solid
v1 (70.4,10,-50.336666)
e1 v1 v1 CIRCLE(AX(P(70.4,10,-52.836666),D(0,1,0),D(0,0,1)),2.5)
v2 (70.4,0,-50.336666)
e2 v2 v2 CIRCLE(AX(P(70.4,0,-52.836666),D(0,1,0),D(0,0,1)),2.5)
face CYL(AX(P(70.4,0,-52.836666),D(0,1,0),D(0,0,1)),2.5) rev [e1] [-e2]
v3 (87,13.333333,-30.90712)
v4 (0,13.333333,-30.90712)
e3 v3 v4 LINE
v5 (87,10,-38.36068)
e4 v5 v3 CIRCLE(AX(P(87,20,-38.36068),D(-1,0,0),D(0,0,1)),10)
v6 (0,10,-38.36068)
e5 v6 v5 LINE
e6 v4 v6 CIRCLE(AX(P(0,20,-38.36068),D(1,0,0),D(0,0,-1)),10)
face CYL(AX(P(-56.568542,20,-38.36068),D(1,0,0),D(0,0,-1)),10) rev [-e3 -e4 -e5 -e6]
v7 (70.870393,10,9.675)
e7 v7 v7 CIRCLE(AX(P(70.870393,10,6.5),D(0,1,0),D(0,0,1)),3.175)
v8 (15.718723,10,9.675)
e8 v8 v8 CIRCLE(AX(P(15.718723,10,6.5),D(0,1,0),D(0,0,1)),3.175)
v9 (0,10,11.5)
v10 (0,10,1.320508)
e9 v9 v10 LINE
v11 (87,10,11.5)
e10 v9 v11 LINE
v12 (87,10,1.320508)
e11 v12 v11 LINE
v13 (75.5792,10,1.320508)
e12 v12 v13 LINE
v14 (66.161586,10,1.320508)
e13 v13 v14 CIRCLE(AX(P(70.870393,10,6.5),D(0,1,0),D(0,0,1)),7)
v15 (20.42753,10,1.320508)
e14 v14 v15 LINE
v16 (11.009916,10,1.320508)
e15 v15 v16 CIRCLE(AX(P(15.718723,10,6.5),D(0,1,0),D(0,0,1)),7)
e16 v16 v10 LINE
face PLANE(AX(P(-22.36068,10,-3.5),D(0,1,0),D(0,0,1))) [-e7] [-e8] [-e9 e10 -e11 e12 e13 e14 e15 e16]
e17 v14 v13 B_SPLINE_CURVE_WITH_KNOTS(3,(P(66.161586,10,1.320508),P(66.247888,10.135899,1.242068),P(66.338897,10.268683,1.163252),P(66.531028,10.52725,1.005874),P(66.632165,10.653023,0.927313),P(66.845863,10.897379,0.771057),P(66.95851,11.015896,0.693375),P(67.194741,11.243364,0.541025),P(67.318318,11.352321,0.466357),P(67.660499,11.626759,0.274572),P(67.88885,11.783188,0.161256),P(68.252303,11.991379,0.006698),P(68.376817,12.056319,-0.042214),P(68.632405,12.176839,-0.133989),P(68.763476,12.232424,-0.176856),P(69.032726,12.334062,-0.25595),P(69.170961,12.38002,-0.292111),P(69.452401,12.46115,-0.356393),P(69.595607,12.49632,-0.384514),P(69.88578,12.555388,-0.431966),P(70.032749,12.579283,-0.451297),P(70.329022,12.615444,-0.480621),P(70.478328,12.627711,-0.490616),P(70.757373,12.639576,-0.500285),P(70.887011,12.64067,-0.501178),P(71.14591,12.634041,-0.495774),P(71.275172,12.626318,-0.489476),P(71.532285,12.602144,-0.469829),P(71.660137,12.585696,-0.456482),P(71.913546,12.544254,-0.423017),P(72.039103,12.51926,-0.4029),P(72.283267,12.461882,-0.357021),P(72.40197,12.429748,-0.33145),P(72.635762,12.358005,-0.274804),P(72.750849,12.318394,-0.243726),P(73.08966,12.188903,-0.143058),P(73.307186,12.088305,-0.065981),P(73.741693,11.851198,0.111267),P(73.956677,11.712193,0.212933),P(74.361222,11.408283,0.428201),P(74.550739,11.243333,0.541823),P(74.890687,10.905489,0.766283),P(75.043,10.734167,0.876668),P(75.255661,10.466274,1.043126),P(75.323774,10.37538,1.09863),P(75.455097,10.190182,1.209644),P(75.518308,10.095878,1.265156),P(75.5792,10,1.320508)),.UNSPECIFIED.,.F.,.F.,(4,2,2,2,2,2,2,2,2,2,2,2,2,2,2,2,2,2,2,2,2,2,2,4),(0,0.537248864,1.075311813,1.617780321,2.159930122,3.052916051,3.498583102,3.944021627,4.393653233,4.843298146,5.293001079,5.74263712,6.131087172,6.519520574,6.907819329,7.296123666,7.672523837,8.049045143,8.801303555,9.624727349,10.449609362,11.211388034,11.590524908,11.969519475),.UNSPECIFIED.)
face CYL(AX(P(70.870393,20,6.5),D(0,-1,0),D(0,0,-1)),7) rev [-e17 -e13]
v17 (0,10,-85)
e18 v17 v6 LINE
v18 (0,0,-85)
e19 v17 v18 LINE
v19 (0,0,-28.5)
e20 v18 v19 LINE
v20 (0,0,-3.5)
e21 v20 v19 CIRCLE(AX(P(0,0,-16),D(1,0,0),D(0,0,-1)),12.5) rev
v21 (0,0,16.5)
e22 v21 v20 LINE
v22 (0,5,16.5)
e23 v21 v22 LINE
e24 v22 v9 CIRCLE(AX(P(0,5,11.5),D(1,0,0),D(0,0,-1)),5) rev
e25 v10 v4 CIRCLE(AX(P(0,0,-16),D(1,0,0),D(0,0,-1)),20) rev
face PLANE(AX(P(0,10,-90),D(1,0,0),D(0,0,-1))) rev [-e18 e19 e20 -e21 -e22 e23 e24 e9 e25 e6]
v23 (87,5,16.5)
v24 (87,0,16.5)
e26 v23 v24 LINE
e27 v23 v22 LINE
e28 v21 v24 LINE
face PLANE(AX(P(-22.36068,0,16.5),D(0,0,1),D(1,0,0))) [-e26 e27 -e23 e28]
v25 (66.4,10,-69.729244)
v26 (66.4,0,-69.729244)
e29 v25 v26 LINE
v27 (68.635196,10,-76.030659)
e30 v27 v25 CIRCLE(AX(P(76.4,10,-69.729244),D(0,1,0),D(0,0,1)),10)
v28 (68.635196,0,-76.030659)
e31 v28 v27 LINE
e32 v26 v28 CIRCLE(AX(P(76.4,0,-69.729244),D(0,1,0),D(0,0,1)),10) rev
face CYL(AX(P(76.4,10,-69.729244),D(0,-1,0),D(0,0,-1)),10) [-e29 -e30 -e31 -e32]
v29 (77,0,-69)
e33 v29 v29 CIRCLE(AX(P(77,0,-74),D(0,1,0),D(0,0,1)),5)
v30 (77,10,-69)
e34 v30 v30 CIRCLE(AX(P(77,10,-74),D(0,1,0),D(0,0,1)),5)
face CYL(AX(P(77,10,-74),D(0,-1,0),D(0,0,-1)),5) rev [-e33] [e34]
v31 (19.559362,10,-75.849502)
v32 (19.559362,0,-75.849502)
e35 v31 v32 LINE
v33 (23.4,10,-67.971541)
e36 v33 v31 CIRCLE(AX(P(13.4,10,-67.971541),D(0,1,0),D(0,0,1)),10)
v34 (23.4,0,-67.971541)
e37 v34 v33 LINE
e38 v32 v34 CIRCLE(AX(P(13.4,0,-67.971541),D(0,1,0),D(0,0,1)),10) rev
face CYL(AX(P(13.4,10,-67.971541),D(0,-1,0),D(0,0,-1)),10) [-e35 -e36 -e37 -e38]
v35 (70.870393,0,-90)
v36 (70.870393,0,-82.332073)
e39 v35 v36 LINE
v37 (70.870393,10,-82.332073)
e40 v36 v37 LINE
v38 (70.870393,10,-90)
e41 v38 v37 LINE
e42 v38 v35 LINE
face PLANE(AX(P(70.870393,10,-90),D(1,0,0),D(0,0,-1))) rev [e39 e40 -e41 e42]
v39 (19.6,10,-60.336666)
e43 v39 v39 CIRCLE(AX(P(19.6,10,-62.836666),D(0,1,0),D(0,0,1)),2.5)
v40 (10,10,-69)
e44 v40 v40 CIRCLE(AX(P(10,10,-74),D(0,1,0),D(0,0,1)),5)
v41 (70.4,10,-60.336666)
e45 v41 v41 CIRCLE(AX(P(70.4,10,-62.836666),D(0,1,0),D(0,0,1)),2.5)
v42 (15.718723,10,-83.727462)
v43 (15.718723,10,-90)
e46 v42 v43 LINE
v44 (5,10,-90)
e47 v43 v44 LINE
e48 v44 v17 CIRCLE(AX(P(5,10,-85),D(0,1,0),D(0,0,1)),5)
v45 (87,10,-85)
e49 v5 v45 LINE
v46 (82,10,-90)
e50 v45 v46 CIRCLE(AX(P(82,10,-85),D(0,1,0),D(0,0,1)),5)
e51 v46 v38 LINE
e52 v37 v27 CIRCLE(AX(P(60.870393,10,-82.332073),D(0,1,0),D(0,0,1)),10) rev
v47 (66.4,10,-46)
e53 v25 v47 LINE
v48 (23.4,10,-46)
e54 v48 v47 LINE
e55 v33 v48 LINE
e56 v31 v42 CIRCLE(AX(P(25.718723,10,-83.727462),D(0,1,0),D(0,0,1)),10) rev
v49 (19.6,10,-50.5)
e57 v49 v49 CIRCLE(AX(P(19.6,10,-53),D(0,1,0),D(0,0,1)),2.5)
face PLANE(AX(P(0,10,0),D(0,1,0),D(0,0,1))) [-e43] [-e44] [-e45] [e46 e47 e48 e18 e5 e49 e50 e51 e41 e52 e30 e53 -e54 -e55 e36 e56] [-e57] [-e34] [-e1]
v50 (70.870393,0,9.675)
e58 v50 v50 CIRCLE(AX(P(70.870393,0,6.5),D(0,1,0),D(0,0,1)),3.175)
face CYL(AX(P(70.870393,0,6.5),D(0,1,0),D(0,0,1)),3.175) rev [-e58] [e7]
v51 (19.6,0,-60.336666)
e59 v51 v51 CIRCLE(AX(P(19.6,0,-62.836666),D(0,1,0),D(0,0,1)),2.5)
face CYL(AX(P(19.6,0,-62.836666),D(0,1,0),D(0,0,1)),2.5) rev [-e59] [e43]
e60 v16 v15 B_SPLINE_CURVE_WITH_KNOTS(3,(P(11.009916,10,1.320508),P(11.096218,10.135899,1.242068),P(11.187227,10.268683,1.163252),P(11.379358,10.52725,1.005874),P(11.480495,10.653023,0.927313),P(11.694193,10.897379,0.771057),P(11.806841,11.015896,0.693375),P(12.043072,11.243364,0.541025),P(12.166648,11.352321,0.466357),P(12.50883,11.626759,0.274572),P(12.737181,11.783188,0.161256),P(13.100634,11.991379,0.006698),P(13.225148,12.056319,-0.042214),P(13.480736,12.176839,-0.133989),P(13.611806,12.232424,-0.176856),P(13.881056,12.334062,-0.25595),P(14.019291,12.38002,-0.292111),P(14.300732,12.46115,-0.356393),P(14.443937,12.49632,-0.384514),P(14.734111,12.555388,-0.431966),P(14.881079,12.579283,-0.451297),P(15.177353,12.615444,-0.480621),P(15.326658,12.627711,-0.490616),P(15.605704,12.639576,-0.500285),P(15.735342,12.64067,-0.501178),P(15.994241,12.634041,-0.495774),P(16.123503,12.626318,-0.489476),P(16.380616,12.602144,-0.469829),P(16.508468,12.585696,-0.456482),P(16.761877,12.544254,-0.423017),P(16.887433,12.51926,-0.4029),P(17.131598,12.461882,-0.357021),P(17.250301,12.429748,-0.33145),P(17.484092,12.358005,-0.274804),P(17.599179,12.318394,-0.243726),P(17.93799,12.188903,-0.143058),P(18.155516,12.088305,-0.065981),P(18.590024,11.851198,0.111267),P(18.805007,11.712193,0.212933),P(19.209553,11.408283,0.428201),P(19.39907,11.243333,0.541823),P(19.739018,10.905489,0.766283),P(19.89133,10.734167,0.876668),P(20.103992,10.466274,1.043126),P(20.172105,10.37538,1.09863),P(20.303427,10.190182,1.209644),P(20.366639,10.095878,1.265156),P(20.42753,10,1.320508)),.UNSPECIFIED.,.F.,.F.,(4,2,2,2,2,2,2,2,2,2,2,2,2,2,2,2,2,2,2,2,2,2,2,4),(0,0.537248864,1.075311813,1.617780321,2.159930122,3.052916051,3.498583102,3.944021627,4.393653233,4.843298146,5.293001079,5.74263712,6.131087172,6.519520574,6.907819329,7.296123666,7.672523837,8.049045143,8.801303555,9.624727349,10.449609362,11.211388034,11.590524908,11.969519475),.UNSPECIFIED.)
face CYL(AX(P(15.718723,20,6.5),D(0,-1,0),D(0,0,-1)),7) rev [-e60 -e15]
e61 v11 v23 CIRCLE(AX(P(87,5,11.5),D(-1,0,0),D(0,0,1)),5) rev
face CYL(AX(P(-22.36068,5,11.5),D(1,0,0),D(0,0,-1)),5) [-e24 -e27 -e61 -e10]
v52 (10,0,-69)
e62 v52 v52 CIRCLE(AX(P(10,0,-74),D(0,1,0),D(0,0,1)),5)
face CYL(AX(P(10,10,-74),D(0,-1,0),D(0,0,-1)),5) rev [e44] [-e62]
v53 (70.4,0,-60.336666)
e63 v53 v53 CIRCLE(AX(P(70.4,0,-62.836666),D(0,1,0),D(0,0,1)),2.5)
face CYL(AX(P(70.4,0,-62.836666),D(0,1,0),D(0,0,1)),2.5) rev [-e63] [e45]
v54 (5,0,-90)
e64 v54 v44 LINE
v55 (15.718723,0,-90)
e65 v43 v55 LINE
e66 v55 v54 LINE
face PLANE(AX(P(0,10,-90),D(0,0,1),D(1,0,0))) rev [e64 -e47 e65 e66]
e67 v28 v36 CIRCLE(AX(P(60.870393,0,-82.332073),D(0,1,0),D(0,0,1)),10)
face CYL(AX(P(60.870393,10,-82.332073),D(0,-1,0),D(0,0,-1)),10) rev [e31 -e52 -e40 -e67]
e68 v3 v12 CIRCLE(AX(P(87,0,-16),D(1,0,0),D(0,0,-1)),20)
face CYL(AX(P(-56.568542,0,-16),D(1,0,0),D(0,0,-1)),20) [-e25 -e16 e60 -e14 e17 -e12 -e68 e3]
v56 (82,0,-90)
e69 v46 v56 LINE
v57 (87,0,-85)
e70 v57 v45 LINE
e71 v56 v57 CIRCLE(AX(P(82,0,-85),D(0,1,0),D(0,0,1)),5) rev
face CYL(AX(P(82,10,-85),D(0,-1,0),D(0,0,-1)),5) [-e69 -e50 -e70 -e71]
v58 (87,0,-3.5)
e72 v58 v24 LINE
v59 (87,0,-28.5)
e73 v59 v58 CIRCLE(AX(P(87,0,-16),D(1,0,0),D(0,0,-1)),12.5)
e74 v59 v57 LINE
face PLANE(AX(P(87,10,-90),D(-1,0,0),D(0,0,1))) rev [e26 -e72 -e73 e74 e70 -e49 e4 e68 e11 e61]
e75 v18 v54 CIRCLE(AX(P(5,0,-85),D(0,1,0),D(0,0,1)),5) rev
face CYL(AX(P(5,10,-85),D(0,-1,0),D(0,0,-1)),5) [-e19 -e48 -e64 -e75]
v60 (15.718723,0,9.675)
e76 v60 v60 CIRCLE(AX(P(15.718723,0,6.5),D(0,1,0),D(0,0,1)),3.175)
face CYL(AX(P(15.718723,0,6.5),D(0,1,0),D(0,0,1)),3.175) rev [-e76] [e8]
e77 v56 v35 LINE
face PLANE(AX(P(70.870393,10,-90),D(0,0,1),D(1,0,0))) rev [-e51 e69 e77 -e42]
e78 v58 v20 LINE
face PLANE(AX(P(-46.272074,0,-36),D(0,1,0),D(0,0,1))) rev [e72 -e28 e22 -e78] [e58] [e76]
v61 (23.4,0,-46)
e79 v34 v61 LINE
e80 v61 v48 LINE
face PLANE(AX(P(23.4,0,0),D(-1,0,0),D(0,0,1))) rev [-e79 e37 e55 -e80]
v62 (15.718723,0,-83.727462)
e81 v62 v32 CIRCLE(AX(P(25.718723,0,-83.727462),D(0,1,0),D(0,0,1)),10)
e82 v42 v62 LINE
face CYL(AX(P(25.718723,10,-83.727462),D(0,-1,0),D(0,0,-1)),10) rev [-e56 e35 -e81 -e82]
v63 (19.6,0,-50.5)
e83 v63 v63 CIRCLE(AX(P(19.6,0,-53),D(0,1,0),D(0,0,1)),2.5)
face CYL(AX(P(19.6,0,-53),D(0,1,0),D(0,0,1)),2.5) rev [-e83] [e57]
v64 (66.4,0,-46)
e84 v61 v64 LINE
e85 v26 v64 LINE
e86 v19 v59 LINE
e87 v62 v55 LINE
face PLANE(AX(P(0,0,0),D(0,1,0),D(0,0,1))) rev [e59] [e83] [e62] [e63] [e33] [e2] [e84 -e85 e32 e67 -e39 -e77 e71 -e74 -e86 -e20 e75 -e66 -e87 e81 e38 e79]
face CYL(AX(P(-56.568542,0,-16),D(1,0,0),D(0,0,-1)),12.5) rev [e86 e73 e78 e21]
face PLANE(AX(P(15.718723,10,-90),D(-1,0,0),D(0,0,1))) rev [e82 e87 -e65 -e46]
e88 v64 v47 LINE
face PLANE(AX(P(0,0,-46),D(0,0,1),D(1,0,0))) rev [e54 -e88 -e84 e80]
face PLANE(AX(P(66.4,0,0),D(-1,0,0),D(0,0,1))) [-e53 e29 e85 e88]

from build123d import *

# Parameters (mm, degrees)
SKETCH1_R           = 5
BOSS_EXTRUDE1_DEPTH = 10
SKETCH3_R           = 2.5
SKETCH3_W           = 43
SKETCH3_H           = 28
CUT_EXTRUDE1_DEPTH  = 126.574678976
FILLET1_R           = 10
FILLET2_R           = 10
BOSS_EXTRUDE2_DEPTH = 87
SKETCH4_4_R         = 12.5
CUT_EXTRUDE3_DEPTH  = 87
FILLET3_R           = 10
SKETCH8_W           = 40
SKETCH8_H           = 23.261660468
CUT_EXTRUDE8_DEPTH  = 87
SKETCH9_W           = 20
SKETCH9_H           = 10
BOSS_EXTRUDE3_DEPTH = 87
FILLET4_R           = 5
SKETCH10_R          = 3.175
CUT_EXTRUDE9_DEPTH  = 126.574678976
FILLET5_R           = 5
SKETCH11_R          = 7
CUT_EXTRUDE10_DEPTH = 126.574678976


with BuildPart() as part:
    # Sketch1 → Boss-Extrude1 (new body)
    with BuildSketch(Plane(origin=(0, 0, 0), x_dir=(1, 0, 0), z_dir=(0, 1, 0))):
        Polygon((0, 90), (15.718723237, 90), (15.718723237, 74), (70.870392539, 74), (70.870392539, 90), (87, 90), (87, 0), (0, 0), align=None)
        with Locations(Location((10, 74, 0), (0, 0, 270))):
            Circle(SKETCH1_R, mode=Mode.SUBTRACT)
        with Locations(Location((77, 74, 0), (0, 0, 270))):
            Circle(SKETCH1_R, mode=Mode.SUBTRACT)
    extrude(amount=BOSS_EXTRUDE1_DEPTH)

    # Sketch3 → Cut-Extrude1 (cut, through all)
    with BuildSketch(Plane(origin=(0, 10, 0), x_dir=(1, 0, 0), z_dir=(0, 1, 0))):
        with Locations(Location((19.6, 53, 0), (0, 0, 270))):
            Circle(SKETCH3_R)
        with Locations(Location((70.4, 62.836666102, 0), (0, 0, 270))):
            Circle(SKETCH3_R)
        with Locations(Location((70.4, 52.836666102, 0), (0, 0, 270))):
            Circle(SKETCH3_R)
        with Locations((44.9, 60)):
            Rectangle(SKETCH3_W, SKETCH3_H)
        with Locations(Location((19.6, 62.836666102, 0), (0, 0, 270))):
            Circle(SKETCH3_R)
    extrude(amount=-CUT_EXTRUDE1_DEPTH, mode=Mode.SUBTRACT)

    # Fillet1
    # the kernel refuses this fillet: 10 mm, written as the material it adds along each edge
    with BuildSketch(Plane(origin=(70.870392539, 0, -74), x_dir=(0, 0, -1), z_dir=(0, 1, 0))) as fillet1_piece_1:
        with BuildLine():
            CenterArc((8.332073051, 10), FILLET1_R, 213.570370594, 56.429629406)
            Line((0, 4.470392539), (-0.166641461, 4.359800389))
            ThreePointArc((-0.166641461, 4.359800389), (-0.2, 2.235196269), (-0.2, 0))
            Line((-0.2, 0), (0, -0.2))
            Line((0, -0.2), (8.332073051, -0.2))
            Line((8.332073051, -0.2), (8.332073051, 0))
        make_face()
    extrude(amount=10)
    with BuildSketch(Plane(origin=(15.718723237, 0, -74), x_dir=(0, 0, -1), z_dir=(0, 1, 0))) as fillet1_piece_2:
        with BuildLine():
            CenterArc((9.727462287, -10), FILLET1_R, 90, 76.592671632)
            Line((0, -7.681276763), (-0.194549246, -7.634902298))
            ThreePointArc((-0.194549246, -7.634902298), (-0.2, -3.840638382), (-0.2, 0))
            Line((-0.2, 0), (0, 0.2))
            Line((0, 0.2), (9.727462287, 0.2))
            Line((9.727462287, 0.2), (9.727462287, 0))
        make_face()
    extrude(amount=10)

    # Fillet2
    fillet2_edges = [part.edges().sort_by_distance(p)[0] for p in [
        (66.4, 5, -74),
        (23.4, 5, -74),
    ]]
    fillet(fillet2_edges, radius=FILLET2_R)

    # Sketch4 → Boss-Extrude2 (add)
    with BuildSketch(Plane(origin=(87, 0, 0), x_dir=(0, 0, -1), z_dir=(1, 0, 0))):
        with BuildLine():
            Line((36, 0), (0, 0))
            Line((0, 0), (0, 10))
            Line((0, 10), (8.5, 10))
            ThreePointArc((8.5, 10), (16, 12.5), (23.5, 10))
            Line((23.5, 10), (33.320508076, 10))
            ThreePointArc((33.320508076, 10), (-3.318516526, -5.176380902), (36, 0))
        make_face()
    extrude(amount=-BOSS_EXTRUDE2_DEPTH)

    # Sketch4<4> → Cut-Extrude3 (cut)
    with BuildSketch(Plane(origin=(87, 0, 0), x_dir=(0, 0, -1), z_dir=(1, 0, 0))):
        with Locations((16, 0)):
            Circle(SKETCH4_4_R)
    extrude(amount=-CUT_EXTRUDE3_DEPTH, mode=Mode.SUBTRACT)

    # Fillet3
    fillet3_edges = [part.edges().sort_by_distance(p)[0] for p in [
        (43.5, 10, -33.320508076),
    ]]
    fillet(fillet3_edges, radius=FILLET3_R)

    # Sketch8 → Cut-Extrude8 (cut)
    with BuildSketch(Plane(origin=(87, 0, 0), x_dir=(0, 0, -1), z_dir=(1, 0, 0))):
        with Locations((16, -11.630830234)):
            Rectangle(SKETCH8_W, SKETCH8_H)
    extrude(amount=-CUT_EXTRUDE8_DEPTH, mode=Mode.SUBTRACT)

    # Sketch9 → Boss-Extrude3 (add)
    with BuildSketch(Plane(origin=(87, 0, 0), x_dir=(0, 0, -1), z_dir=(1, 0, 0))):
        with Locations((-6.5, 5)):
            Rectangle(SKETCH9_W, SKETCH9_H)
    extrude(amount=-BOSS_EXTRUDE3_DEPTH)

    # Fillet4
    fillet4_edges = [part.edges().sort_by_distance(p)[0] for p in [
        (43.5, 10, 16.5),
    ]]
    fillet(fillet4_edges, radius=FILLET4_R)

    # Sketch10 → Cut-Extrude9 (cut, through all)
    with BuildSketch(Plane(origin=(0, 10, 0), x_dir=(1, 0, 0), z_dir=(0, 1, 0))):
        with Locations(Location((15.718723237, -6.5, 0), (0, 0, 270))):
            Circle(SKETCH10_R)
        with Locations(Location((70.870392539, -6.5, 0), (0, 0, 270))):
            Circle(SKETCH10_R)
    extrude(amount=-CUT_EXTRUDE9_DEPTH, mode=Mode.SUBTRACT)

    # Fillet5
    fillet5_edges = [part.edges().sort_by_distance(p)[0] for p in [
        (0, 5, -90),
        (87, 5, -90),
    ]]
    fillet(fillet5_edges, radius=FILLET5_R)

    # Sketch11 → Cut-Extrude10 (cut, through all)
    with BuildSketch(Plane(origin=(0, 10, 0), x_dir=(1, 0, 0), z_dir=(0, 1, 0))):
        with Locations((15.718723237, -6.5)):
            Circle(SKETCH11_R)
        with Locations((70.870392539, -6.5)):
            Circle(SKETCH11_R)
    extrude(amount=CUT_EXTRUDE10_DEPTH, mode=Mode.SUBTRACT)


solid = part.part
